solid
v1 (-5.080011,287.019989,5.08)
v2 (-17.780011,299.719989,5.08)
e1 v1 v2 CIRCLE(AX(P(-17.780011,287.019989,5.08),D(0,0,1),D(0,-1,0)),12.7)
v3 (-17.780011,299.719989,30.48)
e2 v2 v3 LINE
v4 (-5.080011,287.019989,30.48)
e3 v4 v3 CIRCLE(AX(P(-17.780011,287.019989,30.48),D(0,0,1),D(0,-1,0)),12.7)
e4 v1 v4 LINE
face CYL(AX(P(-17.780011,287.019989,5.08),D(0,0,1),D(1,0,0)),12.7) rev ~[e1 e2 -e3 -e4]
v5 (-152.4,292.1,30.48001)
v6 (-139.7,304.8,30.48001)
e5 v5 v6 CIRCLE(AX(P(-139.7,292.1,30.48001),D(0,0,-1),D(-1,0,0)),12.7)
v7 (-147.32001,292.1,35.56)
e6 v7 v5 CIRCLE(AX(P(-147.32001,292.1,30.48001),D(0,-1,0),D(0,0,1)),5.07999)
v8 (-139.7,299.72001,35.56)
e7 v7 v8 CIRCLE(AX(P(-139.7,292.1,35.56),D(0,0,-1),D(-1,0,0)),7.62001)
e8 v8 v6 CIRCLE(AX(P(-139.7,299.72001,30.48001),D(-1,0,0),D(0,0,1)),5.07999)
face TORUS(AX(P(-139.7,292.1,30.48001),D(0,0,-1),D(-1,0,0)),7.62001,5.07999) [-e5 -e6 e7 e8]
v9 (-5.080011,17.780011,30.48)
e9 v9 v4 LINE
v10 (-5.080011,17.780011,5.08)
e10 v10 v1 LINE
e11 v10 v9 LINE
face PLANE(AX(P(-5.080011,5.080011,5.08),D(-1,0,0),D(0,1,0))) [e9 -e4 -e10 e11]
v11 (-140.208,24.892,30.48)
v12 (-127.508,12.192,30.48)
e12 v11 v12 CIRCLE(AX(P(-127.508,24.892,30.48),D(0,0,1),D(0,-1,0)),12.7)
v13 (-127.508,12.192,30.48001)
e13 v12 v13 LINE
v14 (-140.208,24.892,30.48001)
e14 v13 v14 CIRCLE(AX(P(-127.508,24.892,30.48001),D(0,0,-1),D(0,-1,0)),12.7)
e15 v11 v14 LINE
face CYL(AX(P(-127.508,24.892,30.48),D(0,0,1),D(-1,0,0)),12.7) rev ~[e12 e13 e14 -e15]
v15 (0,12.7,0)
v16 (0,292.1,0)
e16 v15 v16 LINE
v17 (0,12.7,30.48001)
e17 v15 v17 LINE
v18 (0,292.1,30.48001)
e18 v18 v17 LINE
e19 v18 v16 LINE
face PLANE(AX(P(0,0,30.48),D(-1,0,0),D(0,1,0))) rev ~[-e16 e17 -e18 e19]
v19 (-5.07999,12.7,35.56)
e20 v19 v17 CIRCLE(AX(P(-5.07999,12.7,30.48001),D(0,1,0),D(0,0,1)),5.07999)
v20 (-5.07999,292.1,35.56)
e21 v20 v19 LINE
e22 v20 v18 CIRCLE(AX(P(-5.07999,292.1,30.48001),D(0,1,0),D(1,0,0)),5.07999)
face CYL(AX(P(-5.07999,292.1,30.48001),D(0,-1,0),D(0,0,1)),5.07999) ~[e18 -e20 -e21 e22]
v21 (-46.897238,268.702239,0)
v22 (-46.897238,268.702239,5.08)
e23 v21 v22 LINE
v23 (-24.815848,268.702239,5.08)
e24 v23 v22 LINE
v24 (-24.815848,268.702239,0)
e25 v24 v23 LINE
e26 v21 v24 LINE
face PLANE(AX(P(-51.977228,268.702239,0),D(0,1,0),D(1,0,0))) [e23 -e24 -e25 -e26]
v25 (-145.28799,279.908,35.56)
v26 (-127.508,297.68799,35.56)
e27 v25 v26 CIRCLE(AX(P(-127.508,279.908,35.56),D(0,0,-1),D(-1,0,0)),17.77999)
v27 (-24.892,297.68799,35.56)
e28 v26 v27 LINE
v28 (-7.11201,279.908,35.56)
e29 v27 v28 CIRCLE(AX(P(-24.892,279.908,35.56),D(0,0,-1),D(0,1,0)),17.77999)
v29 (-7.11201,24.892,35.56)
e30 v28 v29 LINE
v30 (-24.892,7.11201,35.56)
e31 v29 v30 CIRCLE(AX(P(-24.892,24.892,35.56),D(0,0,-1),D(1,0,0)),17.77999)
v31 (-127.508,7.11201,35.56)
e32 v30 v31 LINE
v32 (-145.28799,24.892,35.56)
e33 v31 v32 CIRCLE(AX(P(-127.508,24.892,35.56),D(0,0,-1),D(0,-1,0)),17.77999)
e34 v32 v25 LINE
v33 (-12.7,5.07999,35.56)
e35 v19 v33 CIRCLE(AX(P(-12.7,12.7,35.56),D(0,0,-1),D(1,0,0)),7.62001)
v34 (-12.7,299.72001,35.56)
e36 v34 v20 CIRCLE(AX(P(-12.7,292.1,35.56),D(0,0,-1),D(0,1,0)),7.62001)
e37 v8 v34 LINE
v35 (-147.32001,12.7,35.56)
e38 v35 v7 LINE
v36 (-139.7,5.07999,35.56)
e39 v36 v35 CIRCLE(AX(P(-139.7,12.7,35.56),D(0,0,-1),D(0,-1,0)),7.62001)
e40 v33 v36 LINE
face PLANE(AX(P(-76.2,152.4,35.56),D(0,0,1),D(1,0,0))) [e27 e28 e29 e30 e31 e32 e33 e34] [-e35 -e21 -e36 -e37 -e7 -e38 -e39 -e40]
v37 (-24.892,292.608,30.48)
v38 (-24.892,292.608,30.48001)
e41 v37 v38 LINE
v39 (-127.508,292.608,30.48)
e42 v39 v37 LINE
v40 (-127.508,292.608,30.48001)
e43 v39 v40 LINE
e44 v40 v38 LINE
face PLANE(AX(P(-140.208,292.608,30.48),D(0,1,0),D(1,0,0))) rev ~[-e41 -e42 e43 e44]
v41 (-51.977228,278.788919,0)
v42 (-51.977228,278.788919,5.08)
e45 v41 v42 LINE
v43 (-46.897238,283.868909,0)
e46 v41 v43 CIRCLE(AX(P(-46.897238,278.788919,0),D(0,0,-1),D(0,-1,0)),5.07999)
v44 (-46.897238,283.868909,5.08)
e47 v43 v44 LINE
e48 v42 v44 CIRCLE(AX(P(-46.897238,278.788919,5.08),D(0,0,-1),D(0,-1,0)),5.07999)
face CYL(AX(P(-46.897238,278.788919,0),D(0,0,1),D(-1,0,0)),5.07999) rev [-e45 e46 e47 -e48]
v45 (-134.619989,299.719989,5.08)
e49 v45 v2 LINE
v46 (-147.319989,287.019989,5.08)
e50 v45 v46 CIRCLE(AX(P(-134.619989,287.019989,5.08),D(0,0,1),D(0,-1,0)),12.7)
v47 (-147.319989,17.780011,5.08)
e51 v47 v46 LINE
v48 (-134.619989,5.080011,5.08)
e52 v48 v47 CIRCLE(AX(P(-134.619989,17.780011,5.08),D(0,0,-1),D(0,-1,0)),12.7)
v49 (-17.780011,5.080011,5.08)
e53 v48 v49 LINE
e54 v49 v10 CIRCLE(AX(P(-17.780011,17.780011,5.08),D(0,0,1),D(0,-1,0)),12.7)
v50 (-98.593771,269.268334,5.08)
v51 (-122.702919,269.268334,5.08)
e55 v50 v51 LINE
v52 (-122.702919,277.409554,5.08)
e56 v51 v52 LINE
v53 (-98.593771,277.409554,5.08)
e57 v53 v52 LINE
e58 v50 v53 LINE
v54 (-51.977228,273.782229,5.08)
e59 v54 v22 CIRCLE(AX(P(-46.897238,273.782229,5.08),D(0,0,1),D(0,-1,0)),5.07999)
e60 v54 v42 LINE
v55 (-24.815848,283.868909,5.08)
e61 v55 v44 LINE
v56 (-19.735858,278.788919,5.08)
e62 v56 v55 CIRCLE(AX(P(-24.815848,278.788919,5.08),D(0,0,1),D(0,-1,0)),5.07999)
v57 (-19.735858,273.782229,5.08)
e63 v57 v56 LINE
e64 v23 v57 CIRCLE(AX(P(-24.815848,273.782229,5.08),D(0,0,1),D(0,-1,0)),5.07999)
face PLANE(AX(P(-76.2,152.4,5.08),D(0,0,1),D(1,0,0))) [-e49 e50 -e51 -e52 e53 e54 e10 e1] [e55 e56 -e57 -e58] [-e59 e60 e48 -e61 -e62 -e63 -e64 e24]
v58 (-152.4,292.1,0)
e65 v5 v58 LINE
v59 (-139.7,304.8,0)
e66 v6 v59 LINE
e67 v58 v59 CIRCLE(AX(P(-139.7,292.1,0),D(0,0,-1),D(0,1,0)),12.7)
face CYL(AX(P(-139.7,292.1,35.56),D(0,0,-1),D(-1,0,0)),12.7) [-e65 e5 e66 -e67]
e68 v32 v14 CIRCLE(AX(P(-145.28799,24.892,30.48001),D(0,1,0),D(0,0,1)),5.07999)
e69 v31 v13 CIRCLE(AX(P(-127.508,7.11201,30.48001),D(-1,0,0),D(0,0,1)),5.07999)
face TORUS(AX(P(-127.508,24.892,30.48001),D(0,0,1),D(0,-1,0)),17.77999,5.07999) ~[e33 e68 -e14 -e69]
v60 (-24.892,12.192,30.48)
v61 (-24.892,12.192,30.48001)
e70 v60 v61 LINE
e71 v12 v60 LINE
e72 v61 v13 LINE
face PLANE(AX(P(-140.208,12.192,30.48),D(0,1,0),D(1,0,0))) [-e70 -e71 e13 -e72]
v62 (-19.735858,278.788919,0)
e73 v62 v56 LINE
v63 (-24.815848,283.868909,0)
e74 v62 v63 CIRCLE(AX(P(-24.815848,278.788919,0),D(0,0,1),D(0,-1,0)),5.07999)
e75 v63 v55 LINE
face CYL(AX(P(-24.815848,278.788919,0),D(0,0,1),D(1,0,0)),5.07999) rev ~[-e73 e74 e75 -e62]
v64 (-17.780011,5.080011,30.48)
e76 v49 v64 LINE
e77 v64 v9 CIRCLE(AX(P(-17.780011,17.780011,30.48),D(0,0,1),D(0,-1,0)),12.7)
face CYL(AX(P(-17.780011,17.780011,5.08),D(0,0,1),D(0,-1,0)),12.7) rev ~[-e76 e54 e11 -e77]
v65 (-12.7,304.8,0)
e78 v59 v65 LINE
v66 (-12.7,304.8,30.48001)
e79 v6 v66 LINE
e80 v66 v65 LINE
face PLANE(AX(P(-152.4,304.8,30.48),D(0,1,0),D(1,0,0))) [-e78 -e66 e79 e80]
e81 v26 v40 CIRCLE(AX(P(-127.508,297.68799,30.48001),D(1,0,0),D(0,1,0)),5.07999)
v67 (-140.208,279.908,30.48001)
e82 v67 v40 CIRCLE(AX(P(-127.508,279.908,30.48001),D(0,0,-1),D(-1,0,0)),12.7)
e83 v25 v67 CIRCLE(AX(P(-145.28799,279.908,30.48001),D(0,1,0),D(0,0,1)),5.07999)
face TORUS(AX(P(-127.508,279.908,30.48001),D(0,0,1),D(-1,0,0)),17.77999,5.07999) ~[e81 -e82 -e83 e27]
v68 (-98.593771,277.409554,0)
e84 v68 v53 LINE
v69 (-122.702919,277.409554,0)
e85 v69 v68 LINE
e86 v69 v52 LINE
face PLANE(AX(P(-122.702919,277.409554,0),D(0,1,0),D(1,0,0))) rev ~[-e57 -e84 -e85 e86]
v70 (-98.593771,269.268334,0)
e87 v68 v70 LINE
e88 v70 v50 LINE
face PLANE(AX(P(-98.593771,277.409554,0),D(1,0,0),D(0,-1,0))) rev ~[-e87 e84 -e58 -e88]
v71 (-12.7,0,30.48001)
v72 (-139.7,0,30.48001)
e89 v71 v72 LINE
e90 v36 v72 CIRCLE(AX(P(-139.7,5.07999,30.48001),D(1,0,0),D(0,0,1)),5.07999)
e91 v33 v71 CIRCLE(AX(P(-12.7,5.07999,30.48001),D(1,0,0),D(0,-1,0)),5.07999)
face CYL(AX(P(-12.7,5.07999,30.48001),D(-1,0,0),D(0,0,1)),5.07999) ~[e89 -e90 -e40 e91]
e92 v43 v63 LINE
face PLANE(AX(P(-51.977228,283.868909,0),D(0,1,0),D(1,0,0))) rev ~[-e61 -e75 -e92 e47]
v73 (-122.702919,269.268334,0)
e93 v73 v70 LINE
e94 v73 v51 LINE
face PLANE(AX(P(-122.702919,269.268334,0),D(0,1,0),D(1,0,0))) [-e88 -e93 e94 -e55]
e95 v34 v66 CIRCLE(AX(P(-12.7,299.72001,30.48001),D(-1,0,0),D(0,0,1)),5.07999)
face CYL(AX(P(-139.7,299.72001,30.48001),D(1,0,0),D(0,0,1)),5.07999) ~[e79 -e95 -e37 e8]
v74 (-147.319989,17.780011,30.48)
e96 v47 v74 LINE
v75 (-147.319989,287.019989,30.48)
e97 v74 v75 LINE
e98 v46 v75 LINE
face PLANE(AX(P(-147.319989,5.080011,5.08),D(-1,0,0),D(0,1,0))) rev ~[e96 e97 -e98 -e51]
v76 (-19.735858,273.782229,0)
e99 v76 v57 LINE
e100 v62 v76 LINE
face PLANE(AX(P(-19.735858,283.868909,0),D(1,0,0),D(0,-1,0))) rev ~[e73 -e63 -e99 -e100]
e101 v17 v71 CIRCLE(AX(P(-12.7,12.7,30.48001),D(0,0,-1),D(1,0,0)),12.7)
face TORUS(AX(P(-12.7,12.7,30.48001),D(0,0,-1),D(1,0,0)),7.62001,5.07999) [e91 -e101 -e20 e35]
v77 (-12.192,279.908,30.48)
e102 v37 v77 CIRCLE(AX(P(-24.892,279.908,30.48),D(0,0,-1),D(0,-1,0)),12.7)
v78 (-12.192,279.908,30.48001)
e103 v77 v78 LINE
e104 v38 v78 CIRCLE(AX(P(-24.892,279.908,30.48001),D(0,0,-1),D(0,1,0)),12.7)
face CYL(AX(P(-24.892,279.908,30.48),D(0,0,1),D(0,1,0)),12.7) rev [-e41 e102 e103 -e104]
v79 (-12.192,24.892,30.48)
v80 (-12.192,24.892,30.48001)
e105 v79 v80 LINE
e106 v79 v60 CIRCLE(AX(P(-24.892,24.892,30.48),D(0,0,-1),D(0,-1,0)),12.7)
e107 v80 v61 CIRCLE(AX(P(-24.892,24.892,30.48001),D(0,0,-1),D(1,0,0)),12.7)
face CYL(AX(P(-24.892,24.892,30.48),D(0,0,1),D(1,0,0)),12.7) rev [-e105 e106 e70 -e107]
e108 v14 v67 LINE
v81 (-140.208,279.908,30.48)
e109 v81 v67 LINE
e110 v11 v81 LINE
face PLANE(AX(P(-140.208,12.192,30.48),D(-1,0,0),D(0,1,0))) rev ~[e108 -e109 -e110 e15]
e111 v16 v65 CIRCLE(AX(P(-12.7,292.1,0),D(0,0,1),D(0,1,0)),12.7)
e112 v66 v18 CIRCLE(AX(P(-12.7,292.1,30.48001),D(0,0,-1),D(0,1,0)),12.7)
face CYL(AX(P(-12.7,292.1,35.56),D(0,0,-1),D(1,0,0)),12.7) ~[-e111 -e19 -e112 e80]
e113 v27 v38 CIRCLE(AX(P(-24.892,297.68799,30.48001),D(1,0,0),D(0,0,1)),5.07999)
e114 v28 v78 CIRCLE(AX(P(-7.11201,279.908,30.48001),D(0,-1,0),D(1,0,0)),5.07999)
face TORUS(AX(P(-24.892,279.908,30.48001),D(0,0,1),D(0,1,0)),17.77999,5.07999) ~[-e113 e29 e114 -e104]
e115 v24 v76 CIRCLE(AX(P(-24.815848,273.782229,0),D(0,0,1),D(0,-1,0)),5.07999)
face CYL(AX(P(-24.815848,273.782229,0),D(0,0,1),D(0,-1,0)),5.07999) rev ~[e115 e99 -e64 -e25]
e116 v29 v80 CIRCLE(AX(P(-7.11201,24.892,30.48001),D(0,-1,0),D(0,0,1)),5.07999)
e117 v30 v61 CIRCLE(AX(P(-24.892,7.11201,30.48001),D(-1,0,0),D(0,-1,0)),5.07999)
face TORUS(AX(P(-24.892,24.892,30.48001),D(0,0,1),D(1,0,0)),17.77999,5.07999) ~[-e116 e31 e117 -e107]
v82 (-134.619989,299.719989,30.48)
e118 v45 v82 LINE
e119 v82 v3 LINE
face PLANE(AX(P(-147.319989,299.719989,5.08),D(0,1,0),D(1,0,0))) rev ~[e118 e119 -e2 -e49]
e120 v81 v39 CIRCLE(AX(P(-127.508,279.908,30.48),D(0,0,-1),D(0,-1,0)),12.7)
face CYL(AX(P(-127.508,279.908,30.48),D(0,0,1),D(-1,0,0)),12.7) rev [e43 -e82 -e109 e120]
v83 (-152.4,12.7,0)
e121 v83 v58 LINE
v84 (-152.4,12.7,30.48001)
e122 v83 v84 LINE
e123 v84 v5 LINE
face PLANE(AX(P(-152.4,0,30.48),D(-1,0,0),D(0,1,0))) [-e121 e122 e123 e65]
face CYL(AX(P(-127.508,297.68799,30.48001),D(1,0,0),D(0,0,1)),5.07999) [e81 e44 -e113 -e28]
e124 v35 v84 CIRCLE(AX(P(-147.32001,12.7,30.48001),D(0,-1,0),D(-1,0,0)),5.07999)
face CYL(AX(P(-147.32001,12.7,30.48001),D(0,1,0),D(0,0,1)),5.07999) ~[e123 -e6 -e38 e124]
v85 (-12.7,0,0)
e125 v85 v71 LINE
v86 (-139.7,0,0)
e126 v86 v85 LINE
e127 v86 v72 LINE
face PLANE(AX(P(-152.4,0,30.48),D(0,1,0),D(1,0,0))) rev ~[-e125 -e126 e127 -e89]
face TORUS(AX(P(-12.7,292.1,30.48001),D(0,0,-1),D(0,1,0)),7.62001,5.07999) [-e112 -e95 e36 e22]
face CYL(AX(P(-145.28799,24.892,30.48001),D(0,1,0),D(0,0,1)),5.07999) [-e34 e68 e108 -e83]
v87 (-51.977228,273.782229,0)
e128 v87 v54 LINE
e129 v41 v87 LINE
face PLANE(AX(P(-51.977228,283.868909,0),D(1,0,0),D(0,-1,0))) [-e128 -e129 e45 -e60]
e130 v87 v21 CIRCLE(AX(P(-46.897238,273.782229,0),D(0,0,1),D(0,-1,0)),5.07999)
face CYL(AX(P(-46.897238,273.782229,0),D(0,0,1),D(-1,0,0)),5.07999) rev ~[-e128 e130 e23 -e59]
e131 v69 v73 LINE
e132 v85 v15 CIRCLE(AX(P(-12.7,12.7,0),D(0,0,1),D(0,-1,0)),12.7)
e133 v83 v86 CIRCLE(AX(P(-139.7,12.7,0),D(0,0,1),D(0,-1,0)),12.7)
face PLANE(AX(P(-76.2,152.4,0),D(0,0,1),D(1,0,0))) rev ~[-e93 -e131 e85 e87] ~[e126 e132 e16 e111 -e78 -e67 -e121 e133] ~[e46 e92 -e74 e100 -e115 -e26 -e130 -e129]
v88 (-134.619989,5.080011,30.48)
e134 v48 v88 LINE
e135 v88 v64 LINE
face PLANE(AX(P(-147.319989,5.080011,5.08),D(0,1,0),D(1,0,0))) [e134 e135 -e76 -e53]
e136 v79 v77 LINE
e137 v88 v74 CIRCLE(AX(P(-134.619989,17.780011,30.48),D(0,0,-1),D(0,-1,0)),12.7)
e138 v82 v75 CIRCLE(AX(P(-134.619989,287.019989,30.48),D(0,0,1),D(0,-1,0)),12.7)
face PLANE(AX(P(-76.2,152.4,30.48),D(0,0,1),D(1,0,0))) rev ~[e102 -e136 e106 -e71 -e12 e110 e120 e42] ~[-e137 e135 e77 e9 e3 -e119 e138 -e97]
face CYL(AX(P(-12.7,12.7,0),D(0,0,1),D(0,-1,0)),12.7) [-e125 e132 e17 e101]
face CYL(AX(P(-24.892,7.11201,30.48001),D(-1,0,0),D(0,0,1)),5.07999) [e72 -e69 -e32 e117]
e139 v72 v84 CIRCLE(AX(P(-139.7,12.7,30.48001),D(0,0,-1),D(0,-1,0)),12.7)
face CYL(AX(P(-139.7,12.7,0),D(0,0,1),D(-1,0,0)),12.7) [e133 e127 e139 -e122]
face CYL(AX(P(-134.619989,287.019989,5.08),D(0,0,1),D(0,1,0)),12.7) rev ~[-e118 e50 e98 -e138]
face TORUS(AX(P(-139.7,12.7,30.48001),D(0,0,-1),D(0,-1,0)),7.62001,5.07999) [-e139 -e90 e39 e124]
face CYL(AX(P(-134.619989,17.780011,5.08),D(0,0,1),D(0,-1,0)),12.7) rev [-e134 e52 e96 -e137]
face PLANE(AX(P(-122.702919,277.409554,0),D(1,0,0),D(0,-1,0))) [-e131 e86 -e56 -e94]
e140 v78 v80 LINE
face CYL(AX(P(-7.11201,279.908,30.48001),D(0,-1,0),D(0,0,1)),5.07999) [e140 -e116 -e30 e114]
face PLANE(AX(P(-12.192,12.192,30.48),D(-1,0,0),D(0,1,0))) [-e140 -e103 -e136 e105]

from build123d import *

# Parameters (mm, degrees)
F0_W      = 152.4
F0_H      = 304.8
F1_DEPTH  = 5.08
F2_W      = 152.4
F2_H      = 304.8
F2_W_2    = 142.2399785995
F2_H_2    = 294.6399785995
F3_DEPTH  = 25.4
F4_W      = 152.4
F4_H      = 304.8
F4_W_2    = 142.2399785995
F4_H_2    = 294.6399785995
F4_W_3    = 128.0160005927
F4_H_3    = 280.4160005927
F5_DEPTH  = 5.08
F6_R      = 12.7
F7_W      = 32.2413705289
F7_H      = 15.166670084
F8_DEPTH  = 25.4
F9_R      = 5.07999
F10_W     = 24.1091474891
F10_H     = 8.1412196159
F11_DEPTH = 25.4


# Not quite as in the source:
# - a fillet or chamfer is up to 0.001 mm smaller than in the source, because OpenCascade refuses the exact size


with BuildPart() as f1:
    # F0 (on Top) → F1 (new body)
    with BuildSketch(Plane.XY):
        with Locations((-76.2, 152.4)):
            Rectangle(F0_W, F0_H)
    extrude(amount=F1_DEPTH)

    # F2 (on face) → F3 (join)
    with BuildSketch(Plane.XY.offset(5.08)):
        with Locations((-76.2, 152.4)):
            Rectangle(F2_W, F2_H)
        with Locations((-76.2, 152.4)):
            Rectangle(F2_W_2, F2_H_2, mode=Mode.SUBTRACT)
    extrude(amount=F3_DEPTH)

    # F4 (on face) → F5 (join)
    with BuildSketch(Plane.XY.offset(30.48)):
        with Locations((-76.2, 152.4)):
            Rectangle(F4_W, F4_H)
        with Locations((-76.2, 152.4)):
            Rectangle(F4_W_2, F4_H_2, mode=Mode.SUBTRACT)
        with Locations((-76.2, 152.4)):
            Rectangle(F4_W_2, F4_H_2)
        with Locations((-76.2, 152.4)):
            Rectangle(F4_W_3, F4_H_3, mode=Mode.SUBTRACT)
    extrude(amount=F5_DEPTH)

    # F6
    f6_edges = [f1.edges().sort_by_distance(p)[0] for p in [
        (-152.4, 0, 17.78),
        (0, 0, 17.78),
        (0, 304.8, 17.78),
        (-152.4, 304.8, 17.78),
        (-147.319989, 5.080011, 17.78),
        (-5.080011, 5.080011, 17.78),
        (-5.080011, 299.719989, 17.78),
        (-147.319989, 299.719989, 17.78),
        (-140.208, 12.192, 33.02),
        (-12.192, 292.608, 33.02),
        (-140.208, 292.608, 33.02),
        (-12.192, 12.192, 33.02),
    ]]
    fillet(f6_edges, radius=F6_R)

    # F7 (on face) → F8 (cut)
    with BuildSketch(Plane(origin=(0, 0, 0), x_dir=(1, 0, 0), z_dir=(0, 0, -1))):
        with Locations((-35.8565431088, -276.2855738401)):
            Rectangle(F7_W, F7_H)
    extrude(amount=-F8_DEPTH, mode=Mode.SUBTRACT)

    # F9 (radius 5.08 in the source; OpenCascade refuses exactly that, so slightly less here)
    f9_edges = [f1.edges().sort_by_distance(p)[0] for p in [
        (-51.977228, 283.868909, 2.54),
        (-19.735858, 283.868909, 2.54),
        (-19.735858, 268.702239, 2.54),
        (-51.977228, 268.702239, 2.54),
        (-76.2, 304.8, 35.56),
        (-3.719744, 301.080256, 35.56),
        (-148.680256, 301.080256, 35.56),
        (0, 152.4, 35.56),
        (-152.4, 152.4, 35.56),
        (-3.719744, 3.719744, 35.56),
        (-148.680256, 3.719744, 35.56),
        (-76.2, 0, 35.56),
        (-140.208, 152.4, 35.56),
        (-136.488256, 15.911744, 35.56),
        (-136.488256, 288.888256, 35.56),
        (-76.2, 12.192, 35.56),
        (-76.2, 292.608, 35.56),
        (-15.911744, 15.911744, 35.56),
        (-15.911744, 288.888256, 35.56),
        (-12.192, 152.4, 35.56),
    ]]
    fillet(f9_edges, radius=F9_R)

    # F10 (on face) → F11 (cut)
    with BuildSketch(Plane(origin=(0, 0, 0), x_dir=(1, 0, 0), z_dir=(0, 0, -1))):
        with Locations((-110.6483452022, -273.3389437199)):
            Rectangle(F10_W, F10_H)
    extrude(amount=-F11_DEPTH, mode=Mode.SUBTRACT)


solid = f1.part
